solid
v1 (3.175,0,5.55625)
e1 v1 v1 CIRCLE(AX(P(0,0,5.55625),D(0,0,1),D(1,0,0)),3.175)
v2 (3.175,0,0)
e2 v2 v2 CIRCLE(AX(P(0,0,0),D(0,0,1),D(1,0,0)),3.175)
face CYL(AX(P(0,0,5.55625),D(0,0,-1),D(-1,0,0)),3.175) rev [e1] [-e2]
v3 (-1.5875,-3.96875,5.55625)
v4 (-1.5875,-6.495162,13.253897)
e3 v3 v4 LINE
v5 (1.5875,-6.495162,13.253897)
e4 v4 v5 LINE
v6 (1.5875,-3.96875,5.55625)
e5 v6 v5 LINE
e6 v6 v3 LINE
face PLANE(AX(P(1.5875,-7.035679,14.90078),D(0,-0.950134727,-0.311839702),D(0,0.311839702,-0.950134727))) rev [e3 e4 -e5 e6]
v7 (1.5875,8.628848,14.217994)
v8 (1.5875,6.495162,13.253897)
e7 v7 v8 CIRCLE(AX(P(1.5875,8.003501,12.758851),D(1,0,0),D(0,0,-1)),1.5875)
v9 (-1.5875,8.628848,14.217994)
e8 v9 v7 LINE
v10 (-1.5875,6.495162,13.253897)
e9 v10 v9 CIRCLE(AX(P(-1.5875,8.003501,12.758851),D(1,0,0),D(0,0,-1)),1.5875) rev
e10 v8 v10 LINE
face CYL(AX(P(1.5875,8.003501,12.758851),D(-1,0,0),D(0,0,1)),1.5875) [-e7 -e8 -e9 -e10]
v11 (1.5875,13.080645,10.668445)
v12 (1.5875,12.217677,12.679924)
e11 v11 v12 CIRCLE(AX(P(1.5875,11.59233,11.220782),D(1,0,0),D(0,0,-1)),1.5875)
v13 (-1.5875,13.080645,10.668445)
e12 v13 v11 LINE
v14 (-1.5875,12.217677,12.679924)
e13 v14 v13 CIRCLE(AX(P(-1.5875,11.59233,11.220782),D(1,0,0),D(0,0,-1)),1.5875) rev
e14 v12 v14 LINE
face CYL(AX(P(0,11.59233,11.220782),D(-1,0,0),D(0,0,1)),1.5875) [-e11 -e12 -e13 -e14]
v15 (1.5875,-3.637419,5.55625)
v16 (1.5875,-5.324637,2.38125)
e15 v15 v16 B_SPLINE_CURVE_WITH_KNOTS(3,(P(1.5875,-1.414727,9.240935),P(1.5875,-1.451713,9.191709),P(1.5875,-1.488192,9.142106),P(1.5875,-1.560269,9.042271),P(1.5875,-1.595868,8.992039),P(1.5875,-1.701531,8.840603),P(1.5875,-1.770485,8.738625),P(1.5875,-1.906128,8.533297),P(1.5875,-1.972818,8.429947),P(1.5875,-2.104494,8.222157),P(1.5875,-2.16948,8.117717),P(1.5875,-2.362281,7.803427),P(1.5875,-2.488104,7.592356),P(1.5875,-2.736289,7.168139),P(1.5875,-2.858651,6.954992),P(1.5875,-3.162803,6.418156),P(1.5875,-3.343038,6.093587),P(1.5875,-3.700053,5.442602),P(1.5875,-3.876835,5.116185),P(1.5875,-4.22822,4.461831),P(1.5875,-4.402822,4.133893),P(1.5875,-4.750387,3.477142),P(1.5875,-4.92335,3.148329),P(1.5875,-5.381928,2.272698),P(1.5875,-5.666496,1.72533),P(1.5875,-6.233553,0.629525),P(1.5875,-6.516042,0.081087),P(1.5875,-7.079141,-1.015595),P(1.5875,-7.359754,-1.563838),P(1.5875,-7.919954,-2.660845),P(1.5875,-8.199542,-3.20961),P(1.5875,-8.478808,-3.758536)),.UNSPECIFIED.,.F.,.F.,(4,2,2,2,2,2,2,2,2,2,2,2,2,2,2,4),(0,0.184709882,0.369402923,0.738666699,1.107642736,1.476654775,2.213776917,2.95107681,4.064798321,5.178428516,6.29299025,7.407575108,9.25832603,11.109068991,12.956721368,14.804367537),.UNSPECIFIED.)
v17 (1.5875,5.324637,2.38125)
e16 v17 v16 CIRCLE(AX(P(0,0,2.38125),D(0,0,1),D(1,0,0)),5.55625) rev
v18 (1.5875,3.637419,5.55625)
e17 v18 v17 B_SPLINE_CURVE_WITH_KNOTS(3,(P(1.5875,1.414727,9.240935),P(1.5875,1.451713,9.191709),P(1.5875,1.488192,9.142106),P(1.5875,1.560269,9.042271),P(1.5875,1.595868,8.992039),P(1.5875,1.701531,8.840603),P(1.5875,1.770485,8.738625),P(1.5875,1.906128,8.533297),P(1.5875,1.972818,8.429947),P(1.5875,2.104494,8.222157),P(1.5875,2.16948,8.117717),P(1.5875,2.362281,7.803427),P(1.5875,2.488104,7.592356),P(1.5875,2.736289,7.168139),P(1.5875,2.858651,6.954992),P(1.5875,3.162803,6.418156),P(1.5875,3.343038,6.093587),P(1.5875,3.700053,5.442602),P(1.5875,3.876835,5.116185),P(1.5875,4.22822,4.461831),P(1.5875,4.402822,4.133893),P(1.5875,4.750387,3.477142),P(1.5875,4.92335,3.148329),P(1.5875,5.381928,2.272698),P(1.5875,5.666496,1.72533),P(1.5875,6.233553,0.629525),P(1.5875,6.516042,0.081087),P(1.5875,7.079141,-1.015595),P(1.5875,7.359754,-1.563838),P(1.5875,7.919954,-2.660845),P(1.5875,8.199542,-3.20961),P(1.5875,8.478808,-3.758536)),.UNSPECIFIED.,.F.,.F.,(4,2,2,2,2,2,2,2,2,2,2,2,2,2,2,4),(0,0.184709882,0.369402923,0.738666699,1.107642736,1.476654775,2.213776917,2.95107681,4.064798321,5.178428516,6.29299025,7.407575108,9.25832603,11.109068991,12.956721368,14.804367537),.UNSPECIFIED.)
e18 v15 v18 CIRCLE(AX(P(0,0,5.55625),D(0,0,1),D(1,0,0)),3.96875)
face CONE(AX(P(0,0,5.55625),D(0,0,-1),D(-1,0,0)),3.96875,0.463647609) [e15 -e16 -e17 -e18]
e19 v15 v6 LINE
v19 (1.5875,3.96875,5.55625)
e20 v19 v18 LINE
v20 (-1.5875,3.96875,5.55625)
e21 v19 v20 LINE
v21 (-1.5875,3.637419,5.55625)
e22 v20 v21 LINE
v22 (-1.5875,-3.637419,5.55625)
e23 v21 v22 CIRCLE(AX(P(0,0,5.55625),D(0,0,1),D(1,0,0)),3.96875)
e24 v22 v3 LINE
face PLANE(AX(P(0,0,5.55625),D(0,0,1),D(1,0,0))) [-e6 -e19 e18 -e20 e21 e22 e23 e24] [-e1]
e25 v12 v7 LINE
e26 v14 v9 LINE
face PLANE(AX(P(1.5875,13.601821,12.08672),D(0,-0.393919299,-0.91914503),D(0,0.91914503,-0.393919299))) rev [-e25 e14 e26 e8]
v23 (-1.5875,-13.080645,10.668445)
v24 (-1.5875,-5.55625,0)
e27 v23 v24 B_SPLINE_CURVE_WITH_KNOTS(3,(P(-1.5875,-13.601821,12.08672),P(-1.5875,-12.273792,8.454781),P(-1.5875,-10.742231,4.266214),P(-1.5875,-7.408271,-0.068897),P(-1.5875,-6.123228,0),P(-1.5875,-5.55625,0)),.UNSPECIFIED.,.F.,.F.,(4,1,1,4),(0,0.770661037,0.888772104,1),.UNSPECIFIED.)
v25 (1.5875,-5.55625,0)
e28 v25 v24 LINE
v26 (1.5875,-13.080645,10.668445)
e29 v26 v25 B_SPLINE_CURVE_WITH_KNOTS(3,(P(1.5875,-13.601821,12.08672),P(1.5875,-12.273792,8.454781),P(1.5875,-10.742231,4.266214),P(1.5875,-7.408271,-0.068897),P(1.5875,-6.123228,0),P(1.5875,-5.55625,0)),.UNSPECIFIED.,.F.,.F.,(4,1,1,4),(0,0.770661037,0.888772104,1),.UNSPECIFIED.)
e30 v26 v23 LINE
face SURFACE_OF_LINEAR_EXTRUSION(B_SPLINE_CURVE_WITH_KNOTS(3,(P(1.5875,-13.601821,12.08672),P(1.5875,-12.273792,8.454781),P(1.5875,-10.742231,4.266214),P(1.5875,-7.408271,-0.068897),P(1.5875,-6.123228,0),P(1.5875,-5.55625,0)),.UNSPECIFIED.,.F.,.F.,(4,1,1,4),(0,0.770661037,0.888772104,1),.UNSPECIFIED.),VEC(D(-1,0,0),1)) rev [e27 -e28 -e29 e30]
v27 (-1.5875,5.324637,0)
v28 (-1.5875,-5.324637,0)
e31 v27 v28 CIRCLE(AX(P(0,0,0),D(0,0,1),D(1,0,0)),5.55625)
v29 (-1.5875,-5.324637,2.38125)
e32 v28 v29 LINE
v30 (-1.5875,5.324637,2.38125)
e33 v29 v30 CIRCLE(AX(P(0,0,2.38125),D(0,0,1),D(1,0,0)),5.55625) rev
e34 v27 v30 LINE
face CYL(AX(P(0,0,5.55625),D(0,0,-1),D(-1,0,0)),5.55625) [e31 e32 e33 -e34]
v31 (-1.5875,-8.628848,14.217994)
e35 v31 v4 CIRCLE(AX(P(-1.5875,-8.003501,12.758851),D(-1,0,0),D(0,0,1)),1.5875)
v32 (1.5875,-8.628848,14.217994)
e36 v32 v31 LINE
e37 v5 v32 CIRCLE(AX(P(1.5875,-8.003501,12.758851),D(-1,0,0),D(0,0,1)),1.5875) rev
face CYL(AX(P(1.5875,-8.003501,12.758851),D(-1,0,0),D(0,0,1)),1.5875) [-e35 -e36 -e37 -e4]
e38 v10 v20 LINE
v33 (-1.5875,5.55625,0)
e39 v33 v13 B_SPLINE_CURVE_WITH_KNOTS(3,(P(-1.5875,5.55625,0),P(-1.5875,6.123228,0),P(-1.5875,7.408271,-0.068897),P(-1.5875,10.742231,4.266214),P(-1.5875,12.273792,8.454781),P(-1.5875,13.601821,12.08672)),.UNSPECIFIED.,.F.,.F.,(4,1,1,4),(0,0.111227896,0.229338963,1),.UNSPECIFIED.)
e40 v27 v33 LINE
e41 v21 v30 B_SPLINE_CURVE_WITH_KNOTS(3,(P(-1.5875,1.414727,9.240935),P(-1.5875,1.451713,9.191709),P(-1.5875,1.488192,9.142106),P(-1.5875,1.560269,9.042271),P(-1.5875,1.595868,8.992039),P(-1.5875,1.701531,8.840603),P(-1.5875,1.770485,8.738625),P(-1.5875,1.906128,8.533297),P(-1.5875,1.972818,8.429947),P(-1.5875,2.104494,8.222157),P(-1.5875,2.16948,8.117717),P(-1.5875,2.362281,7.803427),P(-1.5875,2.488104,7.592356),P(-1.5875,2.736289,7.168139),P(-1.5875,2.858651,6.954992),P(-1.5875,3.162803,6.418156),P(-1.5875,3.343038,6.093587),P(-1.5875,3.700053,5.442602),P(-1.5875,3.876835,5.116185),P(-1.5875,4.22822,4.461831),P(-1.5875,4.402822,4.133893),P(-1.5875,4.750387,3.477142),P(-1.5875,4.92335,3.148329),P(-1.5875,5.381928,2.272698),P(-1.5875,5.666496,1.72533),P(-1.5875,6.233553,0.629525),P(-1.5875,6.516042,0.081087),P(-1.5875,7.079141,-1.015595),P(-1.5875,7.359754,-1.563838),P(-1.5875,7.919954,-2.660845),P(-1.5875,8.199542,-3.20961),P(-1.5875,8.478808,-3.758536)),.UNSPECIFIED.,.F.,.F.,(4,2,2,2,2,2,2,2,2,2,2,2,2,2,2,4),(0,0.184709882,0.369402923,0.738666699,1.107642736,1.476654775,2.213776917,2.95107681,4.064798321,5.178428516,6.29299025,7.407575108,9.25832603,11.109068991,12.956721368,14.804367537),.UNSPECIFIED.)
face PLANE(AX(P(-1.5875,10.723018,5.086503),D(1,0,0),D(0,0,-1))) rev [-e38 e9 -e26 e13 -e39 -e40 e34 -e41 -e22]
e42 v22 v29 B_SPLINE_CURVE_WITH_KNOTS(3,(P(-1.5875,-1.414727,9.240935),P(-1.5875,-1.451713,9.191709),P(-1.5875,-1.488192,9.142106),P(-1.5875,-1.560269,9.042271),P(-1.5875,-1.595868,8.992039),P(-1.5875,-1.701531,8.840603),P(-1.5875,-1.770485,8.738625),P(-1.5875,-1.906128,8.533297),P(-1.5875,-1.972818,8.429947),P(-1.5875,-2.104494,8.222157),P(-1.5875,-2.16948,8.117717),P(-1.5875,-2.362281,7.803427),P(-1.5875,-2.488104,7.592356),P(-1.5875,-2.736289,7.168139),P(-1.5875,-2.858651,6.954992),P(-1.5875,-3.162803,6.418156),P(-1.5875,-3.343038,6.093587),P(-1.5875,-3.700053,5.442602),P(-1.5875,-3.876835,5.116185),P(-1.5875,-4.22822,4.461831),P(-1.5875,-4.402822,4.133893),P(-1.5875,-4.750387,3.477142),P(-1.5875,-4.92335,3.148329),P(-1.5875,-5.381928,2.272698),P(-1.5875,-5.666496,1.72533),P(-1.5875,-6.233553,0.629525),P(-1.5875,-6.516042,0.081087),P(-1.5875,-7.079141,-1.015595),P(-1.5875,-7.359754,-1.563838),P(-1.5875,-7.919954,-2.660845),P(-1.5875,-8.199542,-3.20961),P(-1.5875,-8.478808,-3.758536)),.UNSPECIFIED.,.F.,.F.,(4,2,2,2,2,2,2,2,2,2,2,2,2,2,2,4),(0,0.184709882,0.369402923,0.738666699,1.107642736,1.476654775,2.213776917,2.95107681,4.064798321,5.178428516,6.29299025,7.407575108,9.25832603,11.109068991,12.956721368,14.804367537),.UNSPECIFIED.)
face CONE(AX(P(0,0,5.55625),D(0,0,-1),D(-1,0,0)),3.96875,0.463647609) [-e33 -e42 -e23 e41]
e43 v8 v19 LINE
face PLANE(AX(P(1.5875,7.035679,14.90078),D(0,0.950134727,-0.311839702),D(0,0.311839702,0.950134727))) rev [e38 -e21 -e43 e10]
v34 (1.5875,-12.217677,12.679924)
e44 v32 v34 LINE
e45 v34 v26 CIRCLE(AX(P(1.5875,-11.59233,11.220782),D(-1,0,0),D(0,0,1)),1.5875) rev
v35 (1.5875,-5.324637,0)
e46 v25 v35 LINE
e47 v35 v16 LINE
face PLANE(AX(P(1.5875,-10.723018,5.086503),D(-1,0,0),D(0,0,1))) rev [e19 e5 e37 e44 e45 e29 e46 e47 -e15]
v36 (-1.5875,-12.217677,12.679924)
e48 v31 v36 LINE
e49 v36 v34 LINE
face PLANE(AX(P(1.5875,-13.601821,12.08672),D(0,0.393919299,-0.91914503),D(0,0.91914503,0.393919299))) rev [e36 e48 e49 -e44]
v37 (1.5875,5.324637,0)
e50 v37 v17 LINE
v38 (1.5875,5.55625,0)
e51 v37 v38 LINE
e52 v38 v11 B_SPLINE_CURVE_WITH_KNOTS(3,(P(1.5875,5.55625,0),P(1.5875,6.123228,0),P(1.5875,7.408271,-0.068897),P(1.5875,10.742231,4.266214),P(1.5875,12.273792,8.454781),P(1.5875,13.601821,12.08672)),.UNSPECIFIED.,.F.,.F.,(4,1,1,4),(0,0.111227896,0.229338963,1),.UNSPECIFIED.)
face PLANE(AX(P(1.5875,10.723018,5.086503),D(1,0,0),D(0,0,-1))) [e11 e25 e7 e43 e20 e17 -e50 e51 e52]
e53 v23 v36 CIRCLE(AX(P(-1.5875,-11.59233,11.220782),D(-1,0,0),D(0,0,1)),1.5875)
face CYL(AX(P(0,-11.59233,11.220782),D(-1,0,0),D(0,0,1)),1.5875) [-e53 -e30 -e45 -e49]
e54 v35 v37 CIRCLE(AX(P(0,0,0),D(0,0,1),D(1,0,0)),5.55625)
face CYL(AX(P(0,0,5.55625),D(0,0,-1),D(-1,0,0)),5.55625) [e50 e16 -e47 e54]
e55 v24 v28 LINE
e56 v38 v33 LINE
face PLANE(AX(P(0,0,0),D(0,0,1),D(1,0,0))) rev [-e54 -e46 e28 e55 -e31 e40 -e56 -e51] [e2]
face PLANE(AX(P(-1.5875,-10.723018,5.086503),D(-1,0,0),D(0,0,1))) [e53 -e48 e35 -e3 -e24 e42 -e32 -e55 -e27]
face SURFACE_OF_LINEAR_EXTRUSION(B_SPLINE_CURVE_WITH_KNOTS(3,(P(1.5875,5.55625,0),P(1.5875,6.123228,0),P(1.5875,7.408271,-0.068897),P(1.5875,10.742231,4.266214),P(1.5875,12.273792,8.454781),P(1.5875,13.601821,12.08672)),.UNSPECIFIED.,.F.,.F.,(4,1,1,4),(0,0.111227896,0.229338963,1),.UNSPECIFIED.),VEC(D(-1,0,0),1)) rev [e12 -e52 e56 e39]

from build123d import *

# Parameters (mm, degrees)
SKETCH1_R      = 5.55625
SKETCH1_R_2    = 3.175
EXTRUDE1_DEPTH = 5.55625
CHAMFER2_SIZE  = 3.175
CHAMFER2_SIZE2 = 1.5875
EXTRUDE2_START = -1.5875
EXTRUDE2_DEPTH = 3.175
FILLET1_R      = 1.5875


# Read off the part's stored shape, not the designer's step: Extrude2
with BuildPart() as part:
    # Sketch1 → Extrude1 (new body)
    with BuildSketch(Plane.XY):
        Circle(SKETCH1_R)
        Circle(SKETCH1_R_2, mode=Mode.SUBTRACT)
    extrude(amount=EXTRUDE1_DEPTH)

    # Chamfer2
    chamfer2_edges = [part.edges().sort_by_distance(p)[0] for p in [
        (-5.55625, 0, 5.55625),
    ]]
    chamfer2_side = [part.faces().sort_by_distance(p)[0] for p in [
        (-5.55625, 0, 2.778125),
    ]]
    chamfer(chamfer2_edges, length=CHAMFER2_SIZE, length2=CHAMFER2_SIZE2, reference=chamfer2_side[0])

    # Extrude2 outline → Extrude2 (add)
    with BuildSketch(Plane(origin=(0, 0, 0), x_dir=(0, 0, -1), z_dir=(1, 0, 0)).offset(EXTRUDE2_START)):
        with BuildLine():
            add(Edge.make_bspline(
                [(0, 5.55625), (0, 6.123228392), (0.06889711, 7.408271372), (-4.266214485, 10.742230895), (-8.454781371, 12.27379248), (-12.086719505, 13.601821154)],
                knots=[0, 0, 0, 0, 0.111227896, 0.229338963, 1, 1, 1, 1], degree=3))
            Line((-12.086719505, 13.601821154), (-14.900780495, 7.035678846))
            Line((-14.900780495, 7.035678846), (-5.55625, 3.96875))
            Line((-5.55625, 3.96875), (-5.55625, 3.400788734))
            Line((-5.55625, 3.400788734), (-2.261327467, 5.04825))
            Line((-2.261327467, 5.04825), (0, 5.04825))
            Line((0, 5.04825), (0, 5.55625))
        make_face()
        with BuildLine():
            Line((-5.55625, -3.96875), (-14.900780495, -7.035678846))
            Line((-14.900780495, -7.035678846), (-12.086719505, -13.601821154))
            add(Edge.make_bspline(
                [(-12.086719505, -13.601821154), (-8.454781371, -12.27379248), (-4.266214485, -10.742230895), (0.06889711, -7.408271372), (0, -6.123228392), (0, -5.55625)],
                knots=[0, 0, 0, 0, 0.770661037, 0.888772104, 1, 1, 1, 1], degree=3))
            Line((0, -5.55625), (0, -5.04825))
            Line((0, -5.04825), (-2.261327467, -5.04825))
            Line((-2.261327467, -5.04825), (-5.55625, -3.400788734))
            Line((-5.55625, -3.400788734), (-5.55625, -3.96875))
        make_face()
    extrude(amount=EXTRUDE2_DEPTH)

    # Fillet1
    fillet1_edges = [part.edges().sort_by_distance(p)[0] for p in [
        (0, 13.601821154, 12.086719505),
        (0, 7.035678846, 14.900780495),
        (0, -7.035678846, 14.900780495),
        (0, -13.601821154, 12.086719505),
    ]]
    fillet(fillet1_edges, radius=FILLET1_R)


solid = part.part
